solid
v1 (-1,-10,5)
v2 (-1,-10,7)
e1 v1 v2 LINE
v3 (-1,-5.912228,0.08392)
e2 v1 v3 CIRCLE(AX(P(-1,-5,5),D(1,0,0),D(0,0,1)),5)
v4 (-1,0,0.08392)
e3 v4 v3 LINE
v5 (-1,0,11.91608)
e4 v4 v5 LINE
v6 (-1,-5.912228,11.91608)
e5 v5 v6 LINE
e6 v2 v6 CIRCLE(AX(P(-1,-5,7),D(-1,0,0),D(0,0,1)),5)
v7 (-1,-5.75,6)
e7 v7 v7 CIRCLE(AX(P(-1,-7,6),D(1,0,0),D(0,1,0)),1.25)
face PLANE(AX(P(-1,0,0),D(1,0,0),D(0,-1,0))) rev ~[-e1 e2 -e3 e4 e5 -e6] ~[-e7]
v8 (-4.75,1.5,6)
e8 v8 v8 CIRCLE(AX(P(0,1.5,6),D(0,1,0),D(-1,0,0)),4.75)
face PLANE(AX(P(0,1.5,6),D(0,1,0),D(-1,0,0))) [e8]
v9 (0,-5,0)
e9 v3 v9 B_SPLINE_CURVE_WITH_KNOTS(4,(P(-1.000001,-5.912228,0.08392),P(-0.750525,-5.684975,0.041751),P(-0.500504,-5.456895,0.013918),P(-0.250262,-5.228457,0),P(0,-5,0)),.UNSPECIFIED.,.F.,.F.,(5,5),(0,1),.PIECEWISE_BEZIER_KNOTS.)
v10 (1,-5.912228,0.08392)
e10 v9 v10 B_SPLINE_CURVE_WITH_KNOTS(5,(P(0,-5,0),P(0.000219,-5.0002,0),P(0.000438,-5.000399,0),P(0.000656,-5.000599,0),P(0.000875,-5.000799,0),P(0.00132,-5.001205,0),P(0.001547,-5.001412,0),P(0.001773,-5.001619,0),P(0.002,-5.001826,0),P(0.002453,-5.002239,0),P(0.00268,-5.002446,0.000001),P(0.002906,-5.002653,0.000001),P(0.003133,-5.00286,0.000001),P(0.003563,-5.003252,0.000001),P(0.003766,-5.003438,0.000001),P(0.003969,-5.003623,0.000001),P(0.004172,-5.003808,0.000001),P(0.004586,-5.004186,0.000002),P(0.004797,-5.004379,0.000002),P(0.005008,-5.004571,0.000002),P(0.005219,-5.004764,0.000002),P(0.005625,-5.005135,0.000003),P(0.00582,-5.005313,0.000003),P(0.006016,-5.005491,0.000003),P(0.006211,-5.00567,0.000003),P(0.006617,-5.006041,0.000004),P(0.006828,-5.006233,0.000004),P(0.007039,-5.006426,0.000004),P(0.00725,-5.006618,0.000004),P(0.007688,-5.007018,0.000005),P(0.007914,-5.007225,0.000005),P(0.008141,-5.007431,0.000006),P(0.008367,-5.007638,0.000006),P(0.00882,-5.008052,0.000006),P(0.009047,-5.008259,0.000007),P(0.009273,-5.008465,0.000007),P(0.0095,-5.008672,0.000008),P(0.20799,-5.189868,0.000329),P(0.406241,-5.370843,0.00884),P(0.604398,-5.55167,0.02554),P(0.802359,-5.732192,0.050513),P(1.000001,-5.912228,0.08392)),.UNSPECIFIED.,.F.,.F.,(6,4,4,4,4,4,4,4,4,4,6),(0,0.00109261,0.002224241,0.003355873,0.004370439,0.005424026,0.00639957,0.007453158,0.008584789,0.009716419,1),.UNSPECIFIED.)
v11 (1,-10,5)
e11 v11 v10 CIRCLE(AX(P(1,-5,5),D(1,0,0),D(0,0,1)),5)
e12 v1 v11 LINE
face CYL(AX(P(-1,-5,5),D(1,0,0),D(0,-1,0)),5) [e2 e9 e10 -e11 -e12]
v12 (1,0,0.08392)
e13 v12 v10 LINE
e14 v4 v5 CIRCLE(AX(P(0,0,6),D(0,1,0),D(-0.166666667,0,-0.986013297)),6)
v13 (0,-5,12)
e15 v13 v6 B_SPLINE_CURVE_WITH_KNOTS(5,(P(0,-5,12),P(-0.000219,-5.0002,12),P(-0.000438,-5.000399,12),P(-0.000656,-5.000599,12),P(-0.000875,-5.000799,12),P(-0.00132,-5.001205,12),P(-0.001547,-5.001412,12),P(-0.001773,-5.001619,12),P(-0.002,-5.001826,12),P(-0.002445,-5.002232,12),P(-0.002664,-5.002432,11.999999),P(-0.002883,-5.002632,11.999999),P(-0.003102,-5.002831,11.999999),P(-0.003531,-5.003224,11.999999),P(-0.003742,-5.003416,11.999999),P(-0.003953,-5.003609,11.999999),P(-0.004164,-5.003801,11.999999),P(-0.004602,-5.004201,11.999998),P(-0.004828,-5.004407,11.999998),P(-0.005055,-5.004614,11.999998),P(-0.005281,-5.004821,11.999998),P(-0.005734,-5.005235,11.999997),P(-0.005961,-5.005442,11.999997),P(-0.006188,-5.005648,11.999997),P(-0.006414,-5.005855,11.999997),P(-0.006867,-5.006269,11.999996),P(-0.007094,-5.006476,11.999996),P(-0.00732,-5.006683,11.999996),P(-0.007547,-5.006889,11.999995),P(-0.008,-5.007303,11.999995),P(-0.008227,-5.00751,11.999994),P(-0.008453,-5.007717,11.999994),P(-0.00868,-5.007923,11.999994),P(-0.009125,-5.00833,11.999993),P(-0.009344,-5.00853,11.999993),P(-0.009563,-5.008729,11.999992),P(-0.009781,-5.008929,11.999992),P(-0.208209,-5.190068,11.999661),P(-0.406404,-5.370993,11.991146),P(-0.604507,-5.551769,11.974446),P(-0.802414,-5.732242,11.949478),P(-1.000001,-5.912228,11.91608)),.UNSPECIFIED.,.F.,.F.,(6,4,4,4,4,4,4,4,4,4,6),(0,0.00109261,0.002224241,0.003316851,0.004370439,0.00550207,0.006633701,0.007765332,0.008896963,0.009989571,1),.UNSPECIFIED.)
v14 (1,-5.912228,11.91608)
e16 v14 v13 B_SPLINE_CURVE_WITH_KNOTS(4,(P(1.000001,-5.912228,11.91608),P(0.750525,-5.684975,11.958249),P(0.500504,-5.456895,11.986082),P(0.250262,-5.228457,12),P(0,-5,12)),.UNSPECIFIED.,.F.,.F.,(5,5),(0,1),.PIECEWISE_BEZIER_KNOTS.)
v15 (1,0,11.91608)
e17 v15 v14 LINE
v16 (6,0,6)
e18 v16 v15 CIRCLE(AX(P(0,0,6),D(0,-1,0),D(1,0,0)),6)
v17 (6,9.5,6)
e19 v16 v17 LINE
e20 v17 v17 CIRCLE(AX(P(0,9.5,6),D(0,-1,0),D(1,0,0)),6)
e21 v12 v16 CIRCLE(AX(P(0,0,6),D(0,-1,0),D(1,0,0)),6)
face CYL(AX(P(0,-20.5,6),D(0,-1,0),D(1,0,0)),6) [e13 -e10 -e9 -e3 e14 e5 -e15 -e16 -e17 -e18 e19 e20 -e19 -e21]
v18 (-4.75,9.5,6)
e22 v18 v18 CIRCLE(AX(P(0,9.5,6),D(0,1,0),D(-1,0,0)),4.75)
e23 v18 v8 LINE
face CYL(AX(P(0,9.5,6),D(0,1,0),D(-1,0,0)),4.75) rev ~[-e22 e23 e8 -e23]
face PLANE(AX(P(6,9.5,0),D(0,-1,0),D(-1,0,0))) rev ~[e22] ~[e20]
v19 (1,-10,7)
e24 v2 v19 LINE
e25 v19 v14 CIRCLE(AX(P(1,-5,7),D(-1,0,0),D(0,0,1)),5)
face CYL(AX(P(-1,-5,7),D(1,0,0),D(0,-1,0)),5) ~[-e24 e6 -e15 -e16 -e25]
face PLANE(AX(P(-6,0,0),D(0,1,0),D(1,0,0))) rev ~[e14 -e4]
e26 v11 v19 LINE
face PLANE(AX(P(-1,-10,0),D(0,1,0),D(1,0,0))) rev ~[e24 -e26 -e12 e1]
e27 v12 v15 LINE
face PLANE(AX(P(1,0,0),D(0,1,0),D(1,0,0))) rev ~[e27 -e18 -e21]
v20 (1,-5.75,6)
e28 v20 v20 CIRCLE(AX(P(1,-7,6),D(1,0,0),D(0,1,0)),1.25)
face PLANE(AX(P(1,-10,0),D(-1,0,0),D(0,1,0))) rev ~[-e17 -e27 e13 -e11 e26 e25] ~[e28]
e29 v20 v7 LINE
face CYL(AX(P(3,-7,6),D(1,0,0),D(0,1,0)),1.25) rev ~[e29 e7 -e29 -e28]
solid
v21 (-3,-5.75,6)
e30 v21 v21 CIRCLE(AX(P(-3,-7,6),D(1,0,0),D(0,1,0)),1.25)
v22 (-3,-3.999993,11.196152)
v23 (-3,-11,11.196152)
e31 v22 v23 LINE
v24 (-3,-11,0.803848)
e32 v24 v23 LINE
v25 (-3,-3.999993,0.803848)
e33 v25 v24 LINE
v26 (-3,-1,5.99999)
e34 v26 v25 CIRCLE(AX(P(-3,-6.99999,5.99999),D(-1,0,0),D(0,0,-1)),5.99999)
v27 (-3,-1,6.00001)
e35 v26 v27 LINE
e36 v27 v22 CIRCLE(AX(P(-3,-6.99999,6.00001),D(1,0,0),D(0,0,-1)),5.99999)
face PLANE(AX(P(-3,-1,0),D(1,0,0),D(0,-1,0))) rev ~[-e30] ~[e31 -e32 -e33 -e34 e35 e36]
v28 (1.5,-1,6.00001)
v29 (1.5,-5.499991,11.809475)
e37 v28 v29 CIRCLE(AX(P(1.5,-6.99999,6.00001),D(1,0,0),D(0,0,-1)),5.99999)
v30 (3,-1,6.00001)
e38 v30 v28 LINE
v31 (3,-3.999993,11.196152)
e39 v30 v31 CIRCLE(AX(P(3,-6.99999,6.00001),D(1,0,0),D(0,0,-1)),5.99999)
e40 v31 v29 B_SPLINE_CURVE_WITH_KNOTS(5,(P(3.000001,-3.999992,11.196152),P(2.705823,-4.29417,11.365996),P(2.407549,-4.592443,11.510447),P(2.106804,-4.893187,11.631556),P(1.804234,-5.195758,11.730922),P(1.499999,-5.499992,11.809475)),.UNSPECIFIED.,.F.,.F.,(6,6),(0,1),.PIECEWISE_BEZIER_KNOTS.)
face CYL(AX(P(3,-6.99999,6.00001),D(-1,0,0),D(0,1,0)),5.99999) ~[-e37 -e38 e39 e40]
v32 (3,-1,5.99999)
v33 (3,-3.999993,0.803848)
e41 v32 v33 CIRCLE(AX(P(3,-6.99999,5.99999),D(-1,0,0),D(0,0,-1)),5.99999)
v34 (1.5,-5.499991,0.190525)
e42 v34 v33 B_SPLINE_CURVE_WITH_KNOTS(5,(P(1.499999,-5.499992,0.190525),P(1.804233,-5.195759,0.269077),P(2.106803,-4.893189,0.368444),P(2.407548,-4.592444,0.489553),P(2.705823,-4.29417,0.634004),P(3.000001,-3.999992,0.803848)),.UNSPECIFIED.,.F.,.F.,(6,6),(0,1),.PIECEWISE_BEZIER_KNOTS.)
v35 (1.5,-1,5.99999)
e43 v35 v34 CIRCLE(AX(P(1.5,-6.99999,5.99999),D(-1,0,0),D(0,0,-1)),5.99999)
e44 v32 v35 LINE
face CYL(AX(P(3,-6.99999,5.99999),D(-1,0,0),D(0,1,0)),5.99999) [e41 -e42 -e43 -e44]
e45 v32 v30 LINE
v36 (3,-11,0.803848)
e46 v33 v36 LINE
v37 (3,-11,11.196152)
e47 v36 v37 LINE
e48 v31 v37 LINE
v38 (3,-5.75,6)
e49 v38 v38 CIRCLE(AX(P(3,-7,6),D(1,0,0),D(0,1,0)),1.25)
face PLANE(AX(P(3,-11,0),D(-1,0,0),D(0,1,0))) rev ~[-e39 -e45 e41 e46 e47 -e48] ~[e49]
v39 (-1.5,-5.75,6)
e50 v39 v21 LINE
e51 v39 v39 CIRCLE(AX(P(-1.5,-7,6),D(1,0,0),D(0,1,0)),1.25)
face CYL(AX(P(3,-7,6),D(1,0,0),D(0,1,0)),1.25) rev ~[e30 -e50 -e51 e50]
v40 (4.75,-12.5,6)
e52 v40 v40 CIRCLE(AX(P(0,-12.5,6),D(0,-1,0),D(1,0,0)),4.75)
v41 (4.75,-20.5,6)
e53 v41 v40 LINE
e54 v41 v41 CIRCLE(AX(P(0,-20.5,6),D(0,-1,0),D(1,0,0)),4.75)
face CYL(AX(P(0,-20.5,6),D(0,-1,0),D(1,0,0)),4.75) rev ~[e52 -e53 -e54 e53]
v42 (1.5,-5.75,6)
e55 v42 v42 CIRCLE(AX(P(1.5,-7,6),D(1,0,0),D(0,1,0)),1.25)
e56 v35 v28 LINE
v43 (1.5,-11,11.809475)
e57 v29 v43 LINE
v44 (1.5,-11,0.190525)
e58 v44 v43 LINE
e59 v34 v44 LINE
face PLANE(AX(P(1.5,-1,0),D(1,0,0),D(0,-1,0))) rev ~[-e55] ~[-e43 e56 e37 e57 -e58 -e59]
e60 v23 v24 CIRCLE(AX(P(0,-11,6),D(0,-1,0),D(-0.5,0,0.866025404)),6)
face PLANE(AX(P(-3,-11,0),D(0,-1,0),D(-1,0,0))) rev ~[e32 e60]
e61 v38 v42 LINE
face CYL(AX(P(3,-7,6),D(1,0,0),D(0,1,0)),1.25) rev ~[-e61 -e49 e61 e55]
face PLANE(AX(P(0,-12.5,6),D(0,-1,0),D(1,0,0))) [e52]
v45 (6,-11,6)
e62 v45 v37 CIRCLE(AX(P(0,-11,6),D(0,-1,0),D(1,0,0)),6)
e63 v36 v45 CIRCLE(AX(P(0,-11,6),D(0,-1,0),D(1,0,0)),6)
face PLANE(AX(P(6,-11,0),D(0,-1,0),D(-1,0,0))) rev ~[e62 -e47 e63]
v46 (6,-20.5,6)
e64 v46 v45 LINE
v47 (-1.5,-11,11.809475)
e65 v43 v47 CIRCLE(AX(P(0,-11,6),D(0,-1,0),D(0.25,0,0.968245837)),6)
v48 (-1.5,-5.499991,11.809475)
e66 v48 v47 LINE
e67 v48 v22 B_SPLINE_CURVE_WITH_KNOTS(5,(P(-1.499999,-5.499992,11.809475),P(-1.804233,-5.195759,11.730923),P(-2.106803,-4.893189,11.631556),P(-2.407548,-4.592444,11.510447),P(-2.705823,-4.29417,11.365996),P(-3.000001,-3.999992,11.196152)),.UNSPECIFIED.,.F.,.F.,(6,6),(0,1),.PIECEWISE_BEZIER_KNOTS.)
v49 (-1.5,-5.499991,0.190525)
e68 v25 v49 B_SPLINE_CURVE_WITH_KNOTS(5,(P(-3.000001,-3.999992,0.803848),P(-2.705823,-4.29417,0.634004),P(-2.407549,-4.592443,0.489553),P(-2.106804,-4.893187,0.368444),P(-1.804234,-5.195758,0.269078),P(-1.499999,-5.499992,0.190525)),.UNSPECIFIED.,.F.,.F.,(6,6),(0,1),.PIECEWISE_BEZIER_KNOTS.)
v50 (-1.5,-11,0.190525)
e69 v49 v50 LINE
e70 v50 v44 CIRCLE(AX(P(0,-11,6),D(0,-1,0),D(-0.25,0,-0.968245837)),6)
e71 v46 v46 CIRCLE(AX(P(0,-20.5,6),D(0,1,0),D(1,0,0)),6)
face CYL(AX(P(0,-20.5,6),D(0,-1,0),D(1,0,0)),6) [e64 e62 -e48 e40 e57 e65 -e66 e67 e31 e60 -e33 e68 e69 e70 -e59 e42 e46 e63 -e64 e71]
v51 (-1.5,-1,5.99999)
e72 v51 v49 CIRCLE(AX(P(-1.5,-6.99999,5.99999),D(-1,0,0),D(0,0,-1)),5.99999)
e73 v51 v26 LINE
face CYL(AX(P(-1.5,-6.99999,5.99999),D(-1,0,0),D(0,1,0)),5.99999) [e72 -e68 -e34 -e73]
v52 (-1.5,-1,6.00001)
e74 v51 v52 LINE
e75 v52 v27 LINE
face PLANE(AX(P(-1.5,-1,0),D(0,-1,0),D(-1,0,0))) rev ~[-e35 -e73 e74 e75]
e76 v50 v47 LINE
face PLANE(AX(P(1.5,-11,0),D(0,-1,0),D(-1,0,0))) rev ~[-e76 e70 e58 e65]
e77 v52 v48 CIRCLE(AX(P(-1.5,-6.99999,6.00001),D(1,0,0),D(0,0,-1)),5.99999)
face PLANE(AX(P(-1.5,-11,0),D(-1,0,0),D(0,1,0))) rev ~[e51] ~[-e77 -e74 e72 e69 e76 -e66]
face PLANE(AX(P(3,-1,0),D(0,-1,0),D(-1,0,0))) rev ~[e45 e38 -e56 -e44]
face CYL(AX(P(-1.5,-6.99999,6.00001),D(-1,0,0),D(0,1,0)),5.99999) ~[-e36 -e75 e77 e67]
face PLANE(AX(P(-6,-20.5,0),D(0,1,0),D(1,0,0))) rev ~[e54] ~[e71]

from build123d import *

# Parameters (mm, degrees)
F1_DEPTH  = 12
F3_R      = 5.99999
F4_R      = 5
F2_W      = 18.0606292561
F2_H      = 16.2687138654
F2_R      = 6
F5_DEPTH  = 35.7
F6_R      = 1.25
F7_DEPTH  = 25
F8_R      = 4.75
F9_DEPTH  = 8
F10_R     = 4.75
F11_DEPTH = 8


# Not quite as in the source:
# - a fillet or chamfer is up to 0.001 mm smaller than in the source, because OpenCascade refuses the exact size


with BuildPart() as f1:
    # F0 (on Top) → F1 (new body)
    with BuildSketch(Plane.XY):
        Polygon((6, 9.5), (-6, 9.5), (-6, 0), (-1, 0), (-1, -10), (1, -10), (1, 0), (6, 0), align=None)
    extrude(amount=F1_DEPTH)

    # F4
    f4_edges = [f1.edges().sort_by_distance(p)[0] for p in [
        (0, -10, 12),
        (0, -10, 0),
    ]]
    fillet(f4_edges, radius=F4_R)


with BuildPart() as f1b:
    # F0 (on Top) → F1, piece 2 (new body)
    with BuildSketch(Plane.XY):
        Polygon((-6, -11), (-6, -20.5), (6, -20.5), (6, -11), (3, -11), (3, -1), (1.5, -1), (1.5, -11), (-1.5, -11), (-1.5, -1), (-3, -1), (-3, -11), align=None)
    extrude(amount=F1_DEPTH)

    # F3 (radius 6 in the source; OpenCascade refuses exactly that, so slightly less here)
    f3_edges = [f1b.edges().sort_by_distance(p)[0] for p in [
        (2.25, -1, 12),
        (2.25, -1, 0),
        (-2.25, -1, 0),
        (-2.25, -1, 12),
    ]]
    fillet(f3_edges, radius=F3_R)


with BuildPart() as f5_tool:
    # F2 (on face) → F5 (new body)
    with BuildSketch(Plane.XZ.offset(20.5)):
        with Locations((0.2045785077, 5.5509812664)):
            Rectangle(F2_W, F2_H)
        with Locations((0, 6)):
            Circle(F2_R, mode=Mode.SUBTRACT)
    extrude(amount=-F5_DEPTH)


with BuildPart() as f1_1:
    add(f1.part)

    # F5: cut by f5_tool
    add(f5_tool.part, mode=Mode.SUBTRACT)


with BuildPart() as f1b_1:
    add(f1b.part)

    # F5: cut by f5_tool
    add(f5_tool.part, mode=Mode.SUBTRACT)


with BuildPart() as f7_tool:
    # F6 (on face) → F7 (new body)
    with BuildSketch(Plane.YZ.offset(3)):
        with Locations((-7, 6)):
            Circle(F6_R)
    extrude(amount=-F7_DEPTH)


with BuildPart() as f1_2:
    add(f1_1.part)

    # F7: cut by f7_tool
    add(f7_tool.part, mode=Mode.SUBTRACT)

    # F10 (on face) → F11 (cut)
    with BuildSketch(Plane(origin=(0, 9.5, 0), x_dir=(-1, 0, 0), z_dir=(0, 1, 0))):
        with Locations((0, 6)):
            Circle(F10_R)
    extrude(amount=-F11_DEPTH, mode=Mode.SUBTRACT)


with BuildPart() as f1b_2:
    add(f1b_1.part)

    # F7: cut by f7_tool
    add(f7_tool.part, mode=Mode.SUBTRACT)

    # F8 (on face) → F9 (cut)
    with BuildSketch(Plane.XZ.offset(20.5)):
        with Locations((0, 6)):
            Circle(F8_R)
    extrude(amount=-F9_DEPTH, mode=Mode.SUBTRACT)


solid = Compound([f1_2.part, f1b_2.part])
